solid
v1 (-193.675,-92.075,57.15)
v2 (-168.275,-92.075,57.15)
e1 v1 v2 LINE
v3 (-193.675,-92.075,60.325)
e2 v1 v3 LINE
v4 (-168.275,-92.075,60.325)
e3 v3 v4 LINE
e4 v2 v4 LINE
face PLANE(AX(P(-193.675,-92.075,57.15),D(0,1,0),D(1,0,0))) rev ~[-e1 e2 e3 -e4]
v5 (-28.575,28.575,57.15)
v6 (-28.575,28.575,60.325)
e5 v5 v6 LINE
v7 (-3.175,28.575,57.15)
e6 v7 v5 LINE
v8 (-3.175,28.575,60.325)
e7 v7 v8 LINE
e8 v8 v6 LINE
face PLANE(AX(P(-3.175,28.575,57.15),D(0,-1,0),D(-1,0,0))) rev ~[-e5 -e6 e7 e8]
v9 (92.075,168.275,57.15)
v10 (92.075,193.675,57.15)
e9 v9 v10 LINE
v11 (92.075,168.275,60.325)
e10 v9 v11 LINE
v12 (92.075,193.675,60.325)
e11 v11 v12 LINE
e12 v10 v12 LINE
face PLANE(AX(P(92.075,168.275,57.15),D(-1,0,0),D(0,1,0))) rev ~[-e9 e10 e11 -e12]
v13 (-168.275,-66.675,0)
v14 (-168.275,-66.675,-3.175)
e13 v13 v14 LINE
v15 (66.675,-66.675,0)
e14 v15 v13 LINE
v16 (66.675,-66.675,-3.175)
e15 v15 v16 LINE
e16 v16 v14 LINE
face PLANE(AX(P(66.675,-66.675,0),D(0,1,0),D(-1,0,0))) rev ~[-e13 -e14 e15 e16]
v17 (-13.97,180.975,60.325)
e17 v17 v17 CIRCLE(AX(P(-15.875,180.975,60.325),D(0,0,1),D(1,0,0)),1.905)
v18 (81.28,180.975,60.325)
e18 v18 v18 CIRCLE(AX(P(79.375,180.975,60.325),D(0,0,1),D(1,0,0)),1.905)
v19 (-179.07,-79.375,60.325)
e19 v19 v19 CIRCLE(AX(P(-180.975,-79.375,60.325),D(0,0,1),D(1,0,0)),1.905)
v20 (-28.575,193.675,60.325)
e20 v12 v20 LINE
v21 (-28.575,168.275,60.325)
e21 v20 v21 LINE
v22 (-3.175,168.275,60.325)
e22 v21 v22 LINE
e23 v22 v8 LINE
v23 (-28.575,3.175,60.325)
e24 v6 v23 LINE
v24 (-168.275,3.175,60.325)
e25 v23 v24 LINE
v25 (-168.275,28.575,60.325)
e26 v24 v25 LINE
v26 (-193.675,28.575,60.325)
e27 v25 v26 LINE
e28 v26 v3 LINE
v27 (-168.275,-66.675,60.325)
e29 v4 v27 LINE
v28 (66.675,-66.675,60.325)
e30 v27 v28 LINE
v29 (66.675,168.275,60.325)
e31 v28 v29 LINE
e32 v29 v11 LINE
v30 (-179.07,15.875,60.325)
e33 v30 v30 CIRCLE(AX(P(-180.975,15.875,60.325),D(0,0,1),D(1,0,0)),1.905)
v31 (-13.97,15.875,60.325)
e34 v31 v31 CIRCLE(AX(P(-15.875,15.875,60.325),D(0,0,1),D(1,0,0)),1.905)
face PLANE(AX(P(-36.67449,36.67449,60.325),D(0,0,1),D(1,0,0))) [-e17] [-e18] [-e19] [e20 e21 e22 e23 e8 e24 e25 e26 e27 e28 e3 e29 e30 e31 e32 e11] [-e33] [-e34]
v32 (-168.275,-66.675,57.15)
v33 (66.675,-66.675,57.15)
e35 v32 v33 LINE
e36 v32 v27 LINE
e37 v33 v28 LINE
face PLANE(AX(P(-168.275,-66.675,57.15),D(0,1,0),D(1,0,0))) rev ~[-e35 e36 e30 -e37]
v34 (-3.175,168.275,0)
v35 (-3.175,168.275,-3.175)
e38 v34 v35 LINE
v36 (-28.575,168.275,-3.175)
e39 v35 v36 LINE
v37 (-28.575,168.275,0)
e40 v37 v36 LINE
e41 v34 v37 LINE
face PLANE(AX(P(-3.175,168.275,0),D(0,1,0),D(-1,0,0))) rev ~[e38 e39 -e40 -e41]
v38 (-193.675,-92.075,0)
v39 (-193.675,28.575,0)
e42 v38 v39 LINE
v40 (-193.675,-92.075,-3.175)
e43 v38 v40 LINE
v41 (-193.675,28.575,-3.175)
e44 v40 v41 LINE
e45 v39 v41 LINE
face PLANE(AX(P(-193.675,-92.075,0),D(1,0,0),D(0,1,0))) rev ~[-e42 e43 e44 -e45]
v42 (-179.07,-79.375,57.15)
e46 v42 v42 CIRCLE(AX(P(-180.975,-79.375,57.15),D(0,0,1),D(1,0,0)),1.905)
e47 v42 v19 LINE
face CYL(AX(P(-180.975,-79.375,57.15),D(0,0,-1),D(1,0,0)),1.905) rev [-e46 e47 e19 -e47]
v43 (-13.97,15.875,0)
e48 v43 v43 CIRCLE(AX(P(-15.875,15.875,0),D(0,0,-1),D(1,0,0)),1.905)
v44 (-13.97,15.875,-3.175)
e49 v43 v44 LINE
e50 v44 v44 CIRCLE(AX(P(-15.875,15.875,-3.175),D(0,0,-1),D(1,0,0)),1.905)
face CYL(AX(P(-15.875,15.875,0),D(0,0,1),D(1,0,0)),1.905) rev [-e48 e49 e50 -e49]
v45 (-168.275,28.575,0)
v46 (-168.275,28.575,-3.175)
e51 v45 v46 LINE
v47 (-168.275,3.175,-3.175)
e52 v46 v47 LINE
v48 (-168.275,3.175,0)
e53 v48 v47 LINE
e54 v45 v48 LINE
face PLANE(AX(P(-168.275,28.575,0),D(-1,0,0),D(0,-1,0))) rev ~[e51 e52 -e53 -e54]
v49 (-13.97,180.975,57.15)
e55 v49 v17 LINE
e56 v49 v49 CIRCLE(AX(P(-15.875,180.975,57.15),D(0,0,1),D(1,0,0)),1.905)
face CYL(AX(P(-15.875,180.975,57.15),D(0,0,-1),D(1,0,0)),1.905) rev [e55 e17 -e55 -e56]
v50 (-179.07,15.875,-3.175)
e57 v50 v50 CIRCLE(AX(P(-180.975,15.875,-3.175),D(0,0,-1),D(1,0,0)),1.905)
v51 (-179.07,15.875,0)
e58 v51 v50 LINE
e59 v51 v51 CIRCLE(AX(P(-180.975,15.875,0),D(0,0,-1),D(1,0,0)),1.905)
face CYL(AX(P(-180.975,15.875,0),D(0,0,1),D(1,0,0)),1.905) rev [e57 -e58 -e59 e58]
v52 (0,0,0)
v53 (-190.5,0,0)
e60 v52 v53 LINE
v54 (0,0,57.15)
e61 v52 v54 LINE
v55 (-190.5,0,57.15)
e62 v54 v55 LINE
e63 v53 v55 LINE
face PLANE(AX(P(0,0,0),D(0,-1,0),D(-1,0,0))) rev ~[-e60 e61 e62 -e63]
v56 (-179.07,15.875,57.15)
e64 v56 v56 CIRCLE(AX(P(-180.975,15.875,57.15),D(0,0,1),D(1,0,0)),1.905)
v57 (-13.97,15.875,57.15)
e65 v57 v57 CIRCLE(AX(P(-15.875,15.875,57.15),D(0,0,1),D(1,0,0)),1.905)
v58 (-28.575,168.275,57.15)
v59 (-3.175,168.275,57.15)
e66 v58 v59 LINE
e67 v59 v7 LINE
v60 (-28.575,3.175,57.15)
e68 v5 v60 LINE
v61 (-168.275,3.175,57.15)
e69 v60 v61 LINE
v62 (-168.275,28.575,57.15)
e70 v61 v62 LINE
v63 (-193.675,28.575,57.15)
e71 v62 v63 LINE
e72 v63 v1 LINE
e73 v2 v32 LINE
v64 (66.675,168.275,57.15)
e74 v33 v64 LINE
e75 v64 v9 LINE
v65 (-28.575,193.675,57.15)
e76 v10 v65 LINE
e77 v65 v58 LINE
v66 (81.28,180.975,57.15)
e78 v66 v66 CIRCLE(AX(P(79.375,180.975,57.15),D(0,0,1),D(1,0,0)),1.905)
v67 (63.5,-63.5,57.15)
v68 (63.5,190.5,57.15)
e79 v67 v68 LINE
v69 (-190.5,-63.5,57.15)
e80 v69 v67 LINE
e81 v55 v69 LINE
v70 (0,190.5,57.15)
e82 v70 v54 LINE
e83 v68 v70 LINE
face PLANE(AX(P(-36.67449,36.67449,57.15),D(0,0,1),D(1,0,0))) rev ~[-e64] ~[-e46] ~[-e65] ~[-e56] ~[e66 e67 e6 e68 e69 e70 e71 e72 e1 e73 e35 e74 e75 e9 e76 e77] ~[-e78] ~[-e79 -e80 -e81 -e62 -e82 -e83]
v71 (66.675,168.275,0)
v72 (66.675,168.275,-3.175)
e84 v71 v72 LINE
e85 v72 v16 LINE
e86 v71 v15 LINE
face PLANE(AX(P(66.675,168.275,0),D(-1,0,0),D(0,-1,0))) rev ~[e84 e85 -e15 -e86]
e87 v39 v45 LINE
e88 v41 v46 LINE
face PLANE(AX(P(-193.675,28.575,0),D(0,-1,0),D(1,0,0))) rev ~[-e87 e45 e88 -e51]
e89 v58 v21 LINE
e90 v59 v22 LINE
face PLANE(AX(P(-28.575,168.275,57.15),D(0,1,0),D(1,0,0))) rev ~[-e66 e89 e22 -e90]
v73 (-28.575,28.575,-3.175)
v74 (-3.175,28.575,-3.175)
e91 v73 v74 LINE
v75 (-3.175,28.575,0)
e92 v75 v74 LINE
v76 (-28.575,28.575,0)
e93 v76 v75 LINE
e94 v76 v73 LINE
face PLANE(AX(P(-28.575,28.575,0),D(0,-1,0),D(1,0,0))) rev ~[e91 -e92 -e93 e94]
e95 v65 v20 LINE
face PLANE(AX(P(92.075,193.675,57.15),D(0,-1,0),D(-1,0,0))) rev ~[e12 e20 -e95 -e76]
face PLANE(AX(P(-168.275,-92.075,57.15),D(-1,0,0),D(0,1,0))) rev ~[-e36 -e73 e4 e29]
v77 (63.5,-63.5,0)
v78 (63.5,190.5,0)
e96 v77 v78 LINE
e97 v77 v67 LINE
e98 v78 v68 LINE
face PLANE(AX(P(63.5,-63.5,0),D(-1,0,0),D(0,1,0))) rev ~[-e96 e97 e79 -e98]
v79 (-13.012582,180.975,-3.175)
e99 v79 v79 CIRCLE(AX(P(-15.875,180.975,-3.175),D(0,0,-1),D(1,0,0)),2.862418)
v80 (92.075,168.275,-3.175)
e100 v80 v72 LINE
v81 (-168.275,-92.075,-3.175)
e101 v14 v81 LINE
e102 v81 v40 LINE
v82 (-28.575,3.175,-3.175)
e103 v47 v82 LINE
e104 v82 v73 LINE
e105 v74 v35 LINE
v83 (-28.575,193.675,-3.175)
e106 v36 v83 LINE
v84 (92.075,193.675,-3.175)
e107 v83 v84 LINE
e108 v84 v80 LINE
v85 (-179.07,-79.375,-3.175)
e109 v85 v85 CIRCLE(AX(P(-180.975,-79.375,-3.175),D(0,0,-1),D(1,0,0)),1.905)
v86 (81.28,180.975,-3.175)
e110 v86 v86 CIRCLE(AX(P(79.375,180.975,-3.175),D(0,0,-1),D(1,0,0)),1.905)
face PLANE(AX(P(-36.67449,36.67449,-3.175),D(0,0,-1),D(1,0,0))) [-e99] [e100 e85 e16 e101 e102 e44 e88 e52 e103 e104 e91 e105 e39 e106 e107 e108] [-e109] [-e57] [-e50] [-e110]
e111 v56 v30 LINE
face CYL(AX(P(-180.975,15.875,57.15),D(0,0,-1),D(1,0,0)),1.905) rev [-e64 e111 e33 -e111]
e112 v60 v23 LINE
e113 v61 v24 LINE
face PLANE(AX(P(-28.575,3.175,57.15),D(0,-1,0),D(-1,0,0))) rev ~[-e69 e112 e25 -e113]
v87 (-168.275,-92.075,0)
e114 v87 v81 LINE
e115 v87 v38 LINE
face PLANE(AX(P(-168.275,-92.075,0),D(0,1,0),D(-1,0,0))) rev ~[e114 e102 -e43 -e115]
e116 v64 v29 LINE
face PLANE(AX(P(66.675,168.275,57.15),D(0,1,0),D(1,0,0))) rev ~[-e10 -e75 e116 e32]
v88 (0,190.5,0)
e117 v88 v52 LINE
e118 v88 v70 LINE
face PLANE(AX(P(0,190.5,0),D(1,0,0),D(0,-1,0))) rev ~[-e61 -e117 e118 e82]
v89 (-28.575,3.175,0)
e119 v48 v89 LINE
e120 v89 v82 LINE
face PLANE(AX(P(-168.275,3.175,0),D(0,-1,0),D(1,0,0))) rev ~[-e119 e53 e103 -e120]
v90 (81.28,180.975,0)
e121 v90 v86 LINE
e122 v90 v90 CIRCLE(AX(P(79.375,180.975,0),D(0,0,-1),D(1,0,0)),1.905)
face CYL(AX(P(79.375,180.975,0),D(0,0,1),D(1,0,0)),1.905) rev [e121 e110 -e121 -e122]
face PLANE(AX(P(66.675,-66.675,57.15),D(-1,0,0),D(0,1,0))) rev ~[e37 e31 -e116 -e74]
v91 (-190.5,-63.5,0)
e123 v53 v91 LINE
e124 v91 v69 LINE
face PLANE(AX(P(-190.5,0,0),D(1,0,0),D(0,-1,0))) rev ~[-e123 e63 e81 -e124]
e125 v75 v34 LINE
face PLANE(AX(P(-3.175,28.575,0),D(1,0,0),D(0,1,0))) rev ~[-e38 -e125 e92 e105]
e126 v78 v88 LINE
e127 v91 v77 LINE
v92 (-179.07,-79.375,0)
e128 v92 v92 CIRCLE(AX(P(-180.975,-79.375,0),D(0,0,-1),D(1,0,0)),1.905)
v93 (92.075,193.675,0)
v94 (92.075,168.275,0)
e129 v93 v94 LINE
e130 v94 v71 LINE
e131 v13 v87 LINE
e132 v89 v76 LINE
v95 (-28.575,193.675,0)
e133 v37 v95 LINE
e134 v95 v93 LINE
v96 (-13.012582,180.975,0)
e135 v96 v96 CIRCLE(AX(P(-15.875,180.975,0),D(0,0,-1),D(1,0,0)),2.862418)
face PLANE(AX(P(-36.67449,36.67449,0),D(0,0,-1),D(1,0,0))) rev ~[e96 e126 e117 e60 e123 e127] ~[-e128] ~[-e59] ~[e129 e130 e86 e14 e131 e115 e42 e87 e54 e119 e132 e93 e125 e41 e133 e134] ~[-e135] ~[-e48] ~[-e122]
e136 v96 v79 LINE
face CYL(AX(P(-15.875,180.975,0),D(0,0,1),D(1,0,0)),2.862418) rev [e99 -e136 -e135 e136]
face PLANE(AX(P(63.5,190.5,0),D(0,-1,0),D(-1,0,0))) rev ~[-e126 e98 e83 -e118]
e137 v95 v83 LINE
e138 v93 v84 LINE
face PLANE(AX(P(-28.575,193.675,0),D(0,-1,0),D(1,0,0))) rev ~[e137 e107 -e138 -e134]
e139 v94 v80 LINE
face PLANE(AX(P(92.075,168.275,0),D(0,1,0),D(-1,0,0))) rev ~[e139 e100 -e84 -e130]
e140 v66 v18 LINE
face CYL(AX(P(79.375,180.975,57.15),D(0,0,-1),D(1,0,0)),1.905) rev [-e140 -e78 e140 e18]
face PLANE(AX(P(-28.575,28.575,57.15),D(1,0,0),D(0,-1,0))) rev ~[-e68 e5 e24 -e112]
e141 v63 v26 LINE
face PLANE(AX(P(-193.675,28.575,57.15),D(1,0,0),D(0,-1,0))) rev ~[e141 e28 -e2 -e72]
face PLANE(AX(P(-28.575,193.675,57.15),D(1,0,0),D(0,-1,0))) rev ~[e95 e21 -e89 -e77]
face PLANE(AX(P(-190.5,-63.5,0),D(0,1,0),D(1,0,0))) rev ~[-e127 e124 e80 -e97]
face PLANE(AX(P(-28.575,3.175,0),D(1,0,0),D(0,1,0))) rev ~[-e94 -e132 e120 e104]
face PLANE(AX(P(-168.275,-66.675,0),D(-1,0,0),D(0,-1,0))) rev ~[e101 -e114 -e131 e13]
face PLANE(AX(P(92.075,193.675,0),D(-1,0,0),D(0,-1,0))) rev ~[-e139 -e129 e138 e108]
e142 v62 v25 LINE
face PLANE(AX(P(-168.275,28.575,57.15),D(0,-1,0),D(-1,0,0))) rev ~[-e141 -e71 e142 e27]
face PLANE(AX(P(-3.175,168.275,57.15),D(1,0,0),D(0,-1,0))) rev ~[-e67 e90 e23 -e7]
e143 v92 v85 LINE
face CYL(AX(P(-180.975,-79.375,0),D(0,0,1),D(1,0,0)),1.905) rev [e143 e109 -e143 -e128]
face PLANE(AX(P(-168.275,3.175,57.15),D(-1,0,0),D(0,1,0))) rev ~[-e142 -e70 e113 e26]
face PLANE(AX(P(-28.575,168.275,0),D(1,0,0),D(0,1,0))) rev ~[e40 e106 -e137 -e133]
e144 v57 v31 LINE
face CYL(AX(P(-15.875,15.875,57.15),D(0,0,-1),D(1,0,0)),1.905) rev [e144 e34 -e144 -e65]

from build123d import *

# Parameters (mm, degrees)
F1_DEPTH = 57.15
F2_R     = 2.8624183912
F2_R_2   = 1.905
F3_DEPTH = 3.175
F4_R     = 1.905
F5_DEPTH = 3.175


with BuildPart() as f1:
    # F0 (on Top) → F1 (new body)
    with BuildSketch(Plane.XY):
        Polygon((-190.5, 0), (-190.5, -63.5), (63.5, -63.5), (63.5, 190.5), (0, 190.5), (0, 0), align=None)
    extrude(amount=F1_DEPTH)

    # F2 (on face) → F3 (join)
    with BuildSketch(Plane(origin=(0, 0, 0), x_dir=(1, 0, 0), z_dir=(0, 0, -1))):
        Polygon((-168.275, -3.175), (-28.575, -3.175), (-28.575, -28.575), (-3.175, -28.575), (-3.175, -168.275), (-28.575, -168.275), (-28.575, -193.675), (-3.175, -193.675), (66.675, -193.675), (92.075, -193.675), (92.075, -168.275), (66.675, -168.275), (66.675, 66.675), (-168.275, 66.675), (-168.275, 92.075), (-193.675, 92.075), (-193.675, 66.675), (-193.675, -3.175), (-193.675, -28.575), (-168.275, -28.575), align=None)
        Polygon((-190.5, 0), (-190.5, 63.5), (63.5, 63.5), (63.5, -190.5), (0, -190.5), (0, 0), align=None, mode=Mode.SUBTRACT)
        with Locations((-15.875, -180.975)):
            Circle(F2_R, mode=Mode.SUBTRACT)
        with Locations((79.375, -180.975)):
            Circle(F2_R_2, mode=Mode.SUBTRACT)
        with Locations((-180.975, -15.875)):
            Circle(F2_R_2, mode=Mode.SUBTRACT)
        with Locations((-180.975, 79.375)):
            Circle(F2_R_2, mode=Mode.SUBTRACT)
        with Locations((-15.875, -15.875)):
            Circle(F2_R_2, mode=Mode.SUBTRACT)
        Polygon((63.5, 63.5), (-190.5, 63.5), (-190.5, 0), (0, 0), (0, -190.5), (63.5, -190.5), align=None)
    extrude(amount=F3_DEPTH)

    # F4 (on face) → F5 (join)
    with BuildSketch(Plane.XY.offset(57.15)):
        Polygon((-28.575, 168.275), (-3.175, 168.275), (-3.175, 28.575), (-28.575, 28.575), (-28.575, 3.175), (-168.275, 3.175), (-168.275, 28.575), (-193.675, 28.575), (-193.675, 3.175), (-193.675, -66.675), (-193.675, -92.075), (-168.275, -92.075), (-168.275, -66.675), (66.675, -66.675), (66.675, 168.275), (92.075, 168.275), (92.075, 193.675), (66.675, 193.675), (-3.175, 193.675), (-28.575, 193.675), align=None)
        with Locations((-180.975, -79.375)):
            Circle(F4_R, mode=Mode.SUBTRACT)
        with Locations((-180.975, 15.875)):
            Circle(F4_R, mode=Mode.SUBTRACT)
        with Locations((-15.875, 15.875)):
            Circle(F4_R, mode=Mode.SUBTRACT)
        with Locations((-15.875, 180.975)):
            Circle(F4_R, mode=Mode.SUBTRACT)
        with Locations((79.375, 180.975)):
            Circle(F4_R, mode=Mode.SUBTRACT)
    extrude(amount=F5_DEPTH)


solid = f1.part
